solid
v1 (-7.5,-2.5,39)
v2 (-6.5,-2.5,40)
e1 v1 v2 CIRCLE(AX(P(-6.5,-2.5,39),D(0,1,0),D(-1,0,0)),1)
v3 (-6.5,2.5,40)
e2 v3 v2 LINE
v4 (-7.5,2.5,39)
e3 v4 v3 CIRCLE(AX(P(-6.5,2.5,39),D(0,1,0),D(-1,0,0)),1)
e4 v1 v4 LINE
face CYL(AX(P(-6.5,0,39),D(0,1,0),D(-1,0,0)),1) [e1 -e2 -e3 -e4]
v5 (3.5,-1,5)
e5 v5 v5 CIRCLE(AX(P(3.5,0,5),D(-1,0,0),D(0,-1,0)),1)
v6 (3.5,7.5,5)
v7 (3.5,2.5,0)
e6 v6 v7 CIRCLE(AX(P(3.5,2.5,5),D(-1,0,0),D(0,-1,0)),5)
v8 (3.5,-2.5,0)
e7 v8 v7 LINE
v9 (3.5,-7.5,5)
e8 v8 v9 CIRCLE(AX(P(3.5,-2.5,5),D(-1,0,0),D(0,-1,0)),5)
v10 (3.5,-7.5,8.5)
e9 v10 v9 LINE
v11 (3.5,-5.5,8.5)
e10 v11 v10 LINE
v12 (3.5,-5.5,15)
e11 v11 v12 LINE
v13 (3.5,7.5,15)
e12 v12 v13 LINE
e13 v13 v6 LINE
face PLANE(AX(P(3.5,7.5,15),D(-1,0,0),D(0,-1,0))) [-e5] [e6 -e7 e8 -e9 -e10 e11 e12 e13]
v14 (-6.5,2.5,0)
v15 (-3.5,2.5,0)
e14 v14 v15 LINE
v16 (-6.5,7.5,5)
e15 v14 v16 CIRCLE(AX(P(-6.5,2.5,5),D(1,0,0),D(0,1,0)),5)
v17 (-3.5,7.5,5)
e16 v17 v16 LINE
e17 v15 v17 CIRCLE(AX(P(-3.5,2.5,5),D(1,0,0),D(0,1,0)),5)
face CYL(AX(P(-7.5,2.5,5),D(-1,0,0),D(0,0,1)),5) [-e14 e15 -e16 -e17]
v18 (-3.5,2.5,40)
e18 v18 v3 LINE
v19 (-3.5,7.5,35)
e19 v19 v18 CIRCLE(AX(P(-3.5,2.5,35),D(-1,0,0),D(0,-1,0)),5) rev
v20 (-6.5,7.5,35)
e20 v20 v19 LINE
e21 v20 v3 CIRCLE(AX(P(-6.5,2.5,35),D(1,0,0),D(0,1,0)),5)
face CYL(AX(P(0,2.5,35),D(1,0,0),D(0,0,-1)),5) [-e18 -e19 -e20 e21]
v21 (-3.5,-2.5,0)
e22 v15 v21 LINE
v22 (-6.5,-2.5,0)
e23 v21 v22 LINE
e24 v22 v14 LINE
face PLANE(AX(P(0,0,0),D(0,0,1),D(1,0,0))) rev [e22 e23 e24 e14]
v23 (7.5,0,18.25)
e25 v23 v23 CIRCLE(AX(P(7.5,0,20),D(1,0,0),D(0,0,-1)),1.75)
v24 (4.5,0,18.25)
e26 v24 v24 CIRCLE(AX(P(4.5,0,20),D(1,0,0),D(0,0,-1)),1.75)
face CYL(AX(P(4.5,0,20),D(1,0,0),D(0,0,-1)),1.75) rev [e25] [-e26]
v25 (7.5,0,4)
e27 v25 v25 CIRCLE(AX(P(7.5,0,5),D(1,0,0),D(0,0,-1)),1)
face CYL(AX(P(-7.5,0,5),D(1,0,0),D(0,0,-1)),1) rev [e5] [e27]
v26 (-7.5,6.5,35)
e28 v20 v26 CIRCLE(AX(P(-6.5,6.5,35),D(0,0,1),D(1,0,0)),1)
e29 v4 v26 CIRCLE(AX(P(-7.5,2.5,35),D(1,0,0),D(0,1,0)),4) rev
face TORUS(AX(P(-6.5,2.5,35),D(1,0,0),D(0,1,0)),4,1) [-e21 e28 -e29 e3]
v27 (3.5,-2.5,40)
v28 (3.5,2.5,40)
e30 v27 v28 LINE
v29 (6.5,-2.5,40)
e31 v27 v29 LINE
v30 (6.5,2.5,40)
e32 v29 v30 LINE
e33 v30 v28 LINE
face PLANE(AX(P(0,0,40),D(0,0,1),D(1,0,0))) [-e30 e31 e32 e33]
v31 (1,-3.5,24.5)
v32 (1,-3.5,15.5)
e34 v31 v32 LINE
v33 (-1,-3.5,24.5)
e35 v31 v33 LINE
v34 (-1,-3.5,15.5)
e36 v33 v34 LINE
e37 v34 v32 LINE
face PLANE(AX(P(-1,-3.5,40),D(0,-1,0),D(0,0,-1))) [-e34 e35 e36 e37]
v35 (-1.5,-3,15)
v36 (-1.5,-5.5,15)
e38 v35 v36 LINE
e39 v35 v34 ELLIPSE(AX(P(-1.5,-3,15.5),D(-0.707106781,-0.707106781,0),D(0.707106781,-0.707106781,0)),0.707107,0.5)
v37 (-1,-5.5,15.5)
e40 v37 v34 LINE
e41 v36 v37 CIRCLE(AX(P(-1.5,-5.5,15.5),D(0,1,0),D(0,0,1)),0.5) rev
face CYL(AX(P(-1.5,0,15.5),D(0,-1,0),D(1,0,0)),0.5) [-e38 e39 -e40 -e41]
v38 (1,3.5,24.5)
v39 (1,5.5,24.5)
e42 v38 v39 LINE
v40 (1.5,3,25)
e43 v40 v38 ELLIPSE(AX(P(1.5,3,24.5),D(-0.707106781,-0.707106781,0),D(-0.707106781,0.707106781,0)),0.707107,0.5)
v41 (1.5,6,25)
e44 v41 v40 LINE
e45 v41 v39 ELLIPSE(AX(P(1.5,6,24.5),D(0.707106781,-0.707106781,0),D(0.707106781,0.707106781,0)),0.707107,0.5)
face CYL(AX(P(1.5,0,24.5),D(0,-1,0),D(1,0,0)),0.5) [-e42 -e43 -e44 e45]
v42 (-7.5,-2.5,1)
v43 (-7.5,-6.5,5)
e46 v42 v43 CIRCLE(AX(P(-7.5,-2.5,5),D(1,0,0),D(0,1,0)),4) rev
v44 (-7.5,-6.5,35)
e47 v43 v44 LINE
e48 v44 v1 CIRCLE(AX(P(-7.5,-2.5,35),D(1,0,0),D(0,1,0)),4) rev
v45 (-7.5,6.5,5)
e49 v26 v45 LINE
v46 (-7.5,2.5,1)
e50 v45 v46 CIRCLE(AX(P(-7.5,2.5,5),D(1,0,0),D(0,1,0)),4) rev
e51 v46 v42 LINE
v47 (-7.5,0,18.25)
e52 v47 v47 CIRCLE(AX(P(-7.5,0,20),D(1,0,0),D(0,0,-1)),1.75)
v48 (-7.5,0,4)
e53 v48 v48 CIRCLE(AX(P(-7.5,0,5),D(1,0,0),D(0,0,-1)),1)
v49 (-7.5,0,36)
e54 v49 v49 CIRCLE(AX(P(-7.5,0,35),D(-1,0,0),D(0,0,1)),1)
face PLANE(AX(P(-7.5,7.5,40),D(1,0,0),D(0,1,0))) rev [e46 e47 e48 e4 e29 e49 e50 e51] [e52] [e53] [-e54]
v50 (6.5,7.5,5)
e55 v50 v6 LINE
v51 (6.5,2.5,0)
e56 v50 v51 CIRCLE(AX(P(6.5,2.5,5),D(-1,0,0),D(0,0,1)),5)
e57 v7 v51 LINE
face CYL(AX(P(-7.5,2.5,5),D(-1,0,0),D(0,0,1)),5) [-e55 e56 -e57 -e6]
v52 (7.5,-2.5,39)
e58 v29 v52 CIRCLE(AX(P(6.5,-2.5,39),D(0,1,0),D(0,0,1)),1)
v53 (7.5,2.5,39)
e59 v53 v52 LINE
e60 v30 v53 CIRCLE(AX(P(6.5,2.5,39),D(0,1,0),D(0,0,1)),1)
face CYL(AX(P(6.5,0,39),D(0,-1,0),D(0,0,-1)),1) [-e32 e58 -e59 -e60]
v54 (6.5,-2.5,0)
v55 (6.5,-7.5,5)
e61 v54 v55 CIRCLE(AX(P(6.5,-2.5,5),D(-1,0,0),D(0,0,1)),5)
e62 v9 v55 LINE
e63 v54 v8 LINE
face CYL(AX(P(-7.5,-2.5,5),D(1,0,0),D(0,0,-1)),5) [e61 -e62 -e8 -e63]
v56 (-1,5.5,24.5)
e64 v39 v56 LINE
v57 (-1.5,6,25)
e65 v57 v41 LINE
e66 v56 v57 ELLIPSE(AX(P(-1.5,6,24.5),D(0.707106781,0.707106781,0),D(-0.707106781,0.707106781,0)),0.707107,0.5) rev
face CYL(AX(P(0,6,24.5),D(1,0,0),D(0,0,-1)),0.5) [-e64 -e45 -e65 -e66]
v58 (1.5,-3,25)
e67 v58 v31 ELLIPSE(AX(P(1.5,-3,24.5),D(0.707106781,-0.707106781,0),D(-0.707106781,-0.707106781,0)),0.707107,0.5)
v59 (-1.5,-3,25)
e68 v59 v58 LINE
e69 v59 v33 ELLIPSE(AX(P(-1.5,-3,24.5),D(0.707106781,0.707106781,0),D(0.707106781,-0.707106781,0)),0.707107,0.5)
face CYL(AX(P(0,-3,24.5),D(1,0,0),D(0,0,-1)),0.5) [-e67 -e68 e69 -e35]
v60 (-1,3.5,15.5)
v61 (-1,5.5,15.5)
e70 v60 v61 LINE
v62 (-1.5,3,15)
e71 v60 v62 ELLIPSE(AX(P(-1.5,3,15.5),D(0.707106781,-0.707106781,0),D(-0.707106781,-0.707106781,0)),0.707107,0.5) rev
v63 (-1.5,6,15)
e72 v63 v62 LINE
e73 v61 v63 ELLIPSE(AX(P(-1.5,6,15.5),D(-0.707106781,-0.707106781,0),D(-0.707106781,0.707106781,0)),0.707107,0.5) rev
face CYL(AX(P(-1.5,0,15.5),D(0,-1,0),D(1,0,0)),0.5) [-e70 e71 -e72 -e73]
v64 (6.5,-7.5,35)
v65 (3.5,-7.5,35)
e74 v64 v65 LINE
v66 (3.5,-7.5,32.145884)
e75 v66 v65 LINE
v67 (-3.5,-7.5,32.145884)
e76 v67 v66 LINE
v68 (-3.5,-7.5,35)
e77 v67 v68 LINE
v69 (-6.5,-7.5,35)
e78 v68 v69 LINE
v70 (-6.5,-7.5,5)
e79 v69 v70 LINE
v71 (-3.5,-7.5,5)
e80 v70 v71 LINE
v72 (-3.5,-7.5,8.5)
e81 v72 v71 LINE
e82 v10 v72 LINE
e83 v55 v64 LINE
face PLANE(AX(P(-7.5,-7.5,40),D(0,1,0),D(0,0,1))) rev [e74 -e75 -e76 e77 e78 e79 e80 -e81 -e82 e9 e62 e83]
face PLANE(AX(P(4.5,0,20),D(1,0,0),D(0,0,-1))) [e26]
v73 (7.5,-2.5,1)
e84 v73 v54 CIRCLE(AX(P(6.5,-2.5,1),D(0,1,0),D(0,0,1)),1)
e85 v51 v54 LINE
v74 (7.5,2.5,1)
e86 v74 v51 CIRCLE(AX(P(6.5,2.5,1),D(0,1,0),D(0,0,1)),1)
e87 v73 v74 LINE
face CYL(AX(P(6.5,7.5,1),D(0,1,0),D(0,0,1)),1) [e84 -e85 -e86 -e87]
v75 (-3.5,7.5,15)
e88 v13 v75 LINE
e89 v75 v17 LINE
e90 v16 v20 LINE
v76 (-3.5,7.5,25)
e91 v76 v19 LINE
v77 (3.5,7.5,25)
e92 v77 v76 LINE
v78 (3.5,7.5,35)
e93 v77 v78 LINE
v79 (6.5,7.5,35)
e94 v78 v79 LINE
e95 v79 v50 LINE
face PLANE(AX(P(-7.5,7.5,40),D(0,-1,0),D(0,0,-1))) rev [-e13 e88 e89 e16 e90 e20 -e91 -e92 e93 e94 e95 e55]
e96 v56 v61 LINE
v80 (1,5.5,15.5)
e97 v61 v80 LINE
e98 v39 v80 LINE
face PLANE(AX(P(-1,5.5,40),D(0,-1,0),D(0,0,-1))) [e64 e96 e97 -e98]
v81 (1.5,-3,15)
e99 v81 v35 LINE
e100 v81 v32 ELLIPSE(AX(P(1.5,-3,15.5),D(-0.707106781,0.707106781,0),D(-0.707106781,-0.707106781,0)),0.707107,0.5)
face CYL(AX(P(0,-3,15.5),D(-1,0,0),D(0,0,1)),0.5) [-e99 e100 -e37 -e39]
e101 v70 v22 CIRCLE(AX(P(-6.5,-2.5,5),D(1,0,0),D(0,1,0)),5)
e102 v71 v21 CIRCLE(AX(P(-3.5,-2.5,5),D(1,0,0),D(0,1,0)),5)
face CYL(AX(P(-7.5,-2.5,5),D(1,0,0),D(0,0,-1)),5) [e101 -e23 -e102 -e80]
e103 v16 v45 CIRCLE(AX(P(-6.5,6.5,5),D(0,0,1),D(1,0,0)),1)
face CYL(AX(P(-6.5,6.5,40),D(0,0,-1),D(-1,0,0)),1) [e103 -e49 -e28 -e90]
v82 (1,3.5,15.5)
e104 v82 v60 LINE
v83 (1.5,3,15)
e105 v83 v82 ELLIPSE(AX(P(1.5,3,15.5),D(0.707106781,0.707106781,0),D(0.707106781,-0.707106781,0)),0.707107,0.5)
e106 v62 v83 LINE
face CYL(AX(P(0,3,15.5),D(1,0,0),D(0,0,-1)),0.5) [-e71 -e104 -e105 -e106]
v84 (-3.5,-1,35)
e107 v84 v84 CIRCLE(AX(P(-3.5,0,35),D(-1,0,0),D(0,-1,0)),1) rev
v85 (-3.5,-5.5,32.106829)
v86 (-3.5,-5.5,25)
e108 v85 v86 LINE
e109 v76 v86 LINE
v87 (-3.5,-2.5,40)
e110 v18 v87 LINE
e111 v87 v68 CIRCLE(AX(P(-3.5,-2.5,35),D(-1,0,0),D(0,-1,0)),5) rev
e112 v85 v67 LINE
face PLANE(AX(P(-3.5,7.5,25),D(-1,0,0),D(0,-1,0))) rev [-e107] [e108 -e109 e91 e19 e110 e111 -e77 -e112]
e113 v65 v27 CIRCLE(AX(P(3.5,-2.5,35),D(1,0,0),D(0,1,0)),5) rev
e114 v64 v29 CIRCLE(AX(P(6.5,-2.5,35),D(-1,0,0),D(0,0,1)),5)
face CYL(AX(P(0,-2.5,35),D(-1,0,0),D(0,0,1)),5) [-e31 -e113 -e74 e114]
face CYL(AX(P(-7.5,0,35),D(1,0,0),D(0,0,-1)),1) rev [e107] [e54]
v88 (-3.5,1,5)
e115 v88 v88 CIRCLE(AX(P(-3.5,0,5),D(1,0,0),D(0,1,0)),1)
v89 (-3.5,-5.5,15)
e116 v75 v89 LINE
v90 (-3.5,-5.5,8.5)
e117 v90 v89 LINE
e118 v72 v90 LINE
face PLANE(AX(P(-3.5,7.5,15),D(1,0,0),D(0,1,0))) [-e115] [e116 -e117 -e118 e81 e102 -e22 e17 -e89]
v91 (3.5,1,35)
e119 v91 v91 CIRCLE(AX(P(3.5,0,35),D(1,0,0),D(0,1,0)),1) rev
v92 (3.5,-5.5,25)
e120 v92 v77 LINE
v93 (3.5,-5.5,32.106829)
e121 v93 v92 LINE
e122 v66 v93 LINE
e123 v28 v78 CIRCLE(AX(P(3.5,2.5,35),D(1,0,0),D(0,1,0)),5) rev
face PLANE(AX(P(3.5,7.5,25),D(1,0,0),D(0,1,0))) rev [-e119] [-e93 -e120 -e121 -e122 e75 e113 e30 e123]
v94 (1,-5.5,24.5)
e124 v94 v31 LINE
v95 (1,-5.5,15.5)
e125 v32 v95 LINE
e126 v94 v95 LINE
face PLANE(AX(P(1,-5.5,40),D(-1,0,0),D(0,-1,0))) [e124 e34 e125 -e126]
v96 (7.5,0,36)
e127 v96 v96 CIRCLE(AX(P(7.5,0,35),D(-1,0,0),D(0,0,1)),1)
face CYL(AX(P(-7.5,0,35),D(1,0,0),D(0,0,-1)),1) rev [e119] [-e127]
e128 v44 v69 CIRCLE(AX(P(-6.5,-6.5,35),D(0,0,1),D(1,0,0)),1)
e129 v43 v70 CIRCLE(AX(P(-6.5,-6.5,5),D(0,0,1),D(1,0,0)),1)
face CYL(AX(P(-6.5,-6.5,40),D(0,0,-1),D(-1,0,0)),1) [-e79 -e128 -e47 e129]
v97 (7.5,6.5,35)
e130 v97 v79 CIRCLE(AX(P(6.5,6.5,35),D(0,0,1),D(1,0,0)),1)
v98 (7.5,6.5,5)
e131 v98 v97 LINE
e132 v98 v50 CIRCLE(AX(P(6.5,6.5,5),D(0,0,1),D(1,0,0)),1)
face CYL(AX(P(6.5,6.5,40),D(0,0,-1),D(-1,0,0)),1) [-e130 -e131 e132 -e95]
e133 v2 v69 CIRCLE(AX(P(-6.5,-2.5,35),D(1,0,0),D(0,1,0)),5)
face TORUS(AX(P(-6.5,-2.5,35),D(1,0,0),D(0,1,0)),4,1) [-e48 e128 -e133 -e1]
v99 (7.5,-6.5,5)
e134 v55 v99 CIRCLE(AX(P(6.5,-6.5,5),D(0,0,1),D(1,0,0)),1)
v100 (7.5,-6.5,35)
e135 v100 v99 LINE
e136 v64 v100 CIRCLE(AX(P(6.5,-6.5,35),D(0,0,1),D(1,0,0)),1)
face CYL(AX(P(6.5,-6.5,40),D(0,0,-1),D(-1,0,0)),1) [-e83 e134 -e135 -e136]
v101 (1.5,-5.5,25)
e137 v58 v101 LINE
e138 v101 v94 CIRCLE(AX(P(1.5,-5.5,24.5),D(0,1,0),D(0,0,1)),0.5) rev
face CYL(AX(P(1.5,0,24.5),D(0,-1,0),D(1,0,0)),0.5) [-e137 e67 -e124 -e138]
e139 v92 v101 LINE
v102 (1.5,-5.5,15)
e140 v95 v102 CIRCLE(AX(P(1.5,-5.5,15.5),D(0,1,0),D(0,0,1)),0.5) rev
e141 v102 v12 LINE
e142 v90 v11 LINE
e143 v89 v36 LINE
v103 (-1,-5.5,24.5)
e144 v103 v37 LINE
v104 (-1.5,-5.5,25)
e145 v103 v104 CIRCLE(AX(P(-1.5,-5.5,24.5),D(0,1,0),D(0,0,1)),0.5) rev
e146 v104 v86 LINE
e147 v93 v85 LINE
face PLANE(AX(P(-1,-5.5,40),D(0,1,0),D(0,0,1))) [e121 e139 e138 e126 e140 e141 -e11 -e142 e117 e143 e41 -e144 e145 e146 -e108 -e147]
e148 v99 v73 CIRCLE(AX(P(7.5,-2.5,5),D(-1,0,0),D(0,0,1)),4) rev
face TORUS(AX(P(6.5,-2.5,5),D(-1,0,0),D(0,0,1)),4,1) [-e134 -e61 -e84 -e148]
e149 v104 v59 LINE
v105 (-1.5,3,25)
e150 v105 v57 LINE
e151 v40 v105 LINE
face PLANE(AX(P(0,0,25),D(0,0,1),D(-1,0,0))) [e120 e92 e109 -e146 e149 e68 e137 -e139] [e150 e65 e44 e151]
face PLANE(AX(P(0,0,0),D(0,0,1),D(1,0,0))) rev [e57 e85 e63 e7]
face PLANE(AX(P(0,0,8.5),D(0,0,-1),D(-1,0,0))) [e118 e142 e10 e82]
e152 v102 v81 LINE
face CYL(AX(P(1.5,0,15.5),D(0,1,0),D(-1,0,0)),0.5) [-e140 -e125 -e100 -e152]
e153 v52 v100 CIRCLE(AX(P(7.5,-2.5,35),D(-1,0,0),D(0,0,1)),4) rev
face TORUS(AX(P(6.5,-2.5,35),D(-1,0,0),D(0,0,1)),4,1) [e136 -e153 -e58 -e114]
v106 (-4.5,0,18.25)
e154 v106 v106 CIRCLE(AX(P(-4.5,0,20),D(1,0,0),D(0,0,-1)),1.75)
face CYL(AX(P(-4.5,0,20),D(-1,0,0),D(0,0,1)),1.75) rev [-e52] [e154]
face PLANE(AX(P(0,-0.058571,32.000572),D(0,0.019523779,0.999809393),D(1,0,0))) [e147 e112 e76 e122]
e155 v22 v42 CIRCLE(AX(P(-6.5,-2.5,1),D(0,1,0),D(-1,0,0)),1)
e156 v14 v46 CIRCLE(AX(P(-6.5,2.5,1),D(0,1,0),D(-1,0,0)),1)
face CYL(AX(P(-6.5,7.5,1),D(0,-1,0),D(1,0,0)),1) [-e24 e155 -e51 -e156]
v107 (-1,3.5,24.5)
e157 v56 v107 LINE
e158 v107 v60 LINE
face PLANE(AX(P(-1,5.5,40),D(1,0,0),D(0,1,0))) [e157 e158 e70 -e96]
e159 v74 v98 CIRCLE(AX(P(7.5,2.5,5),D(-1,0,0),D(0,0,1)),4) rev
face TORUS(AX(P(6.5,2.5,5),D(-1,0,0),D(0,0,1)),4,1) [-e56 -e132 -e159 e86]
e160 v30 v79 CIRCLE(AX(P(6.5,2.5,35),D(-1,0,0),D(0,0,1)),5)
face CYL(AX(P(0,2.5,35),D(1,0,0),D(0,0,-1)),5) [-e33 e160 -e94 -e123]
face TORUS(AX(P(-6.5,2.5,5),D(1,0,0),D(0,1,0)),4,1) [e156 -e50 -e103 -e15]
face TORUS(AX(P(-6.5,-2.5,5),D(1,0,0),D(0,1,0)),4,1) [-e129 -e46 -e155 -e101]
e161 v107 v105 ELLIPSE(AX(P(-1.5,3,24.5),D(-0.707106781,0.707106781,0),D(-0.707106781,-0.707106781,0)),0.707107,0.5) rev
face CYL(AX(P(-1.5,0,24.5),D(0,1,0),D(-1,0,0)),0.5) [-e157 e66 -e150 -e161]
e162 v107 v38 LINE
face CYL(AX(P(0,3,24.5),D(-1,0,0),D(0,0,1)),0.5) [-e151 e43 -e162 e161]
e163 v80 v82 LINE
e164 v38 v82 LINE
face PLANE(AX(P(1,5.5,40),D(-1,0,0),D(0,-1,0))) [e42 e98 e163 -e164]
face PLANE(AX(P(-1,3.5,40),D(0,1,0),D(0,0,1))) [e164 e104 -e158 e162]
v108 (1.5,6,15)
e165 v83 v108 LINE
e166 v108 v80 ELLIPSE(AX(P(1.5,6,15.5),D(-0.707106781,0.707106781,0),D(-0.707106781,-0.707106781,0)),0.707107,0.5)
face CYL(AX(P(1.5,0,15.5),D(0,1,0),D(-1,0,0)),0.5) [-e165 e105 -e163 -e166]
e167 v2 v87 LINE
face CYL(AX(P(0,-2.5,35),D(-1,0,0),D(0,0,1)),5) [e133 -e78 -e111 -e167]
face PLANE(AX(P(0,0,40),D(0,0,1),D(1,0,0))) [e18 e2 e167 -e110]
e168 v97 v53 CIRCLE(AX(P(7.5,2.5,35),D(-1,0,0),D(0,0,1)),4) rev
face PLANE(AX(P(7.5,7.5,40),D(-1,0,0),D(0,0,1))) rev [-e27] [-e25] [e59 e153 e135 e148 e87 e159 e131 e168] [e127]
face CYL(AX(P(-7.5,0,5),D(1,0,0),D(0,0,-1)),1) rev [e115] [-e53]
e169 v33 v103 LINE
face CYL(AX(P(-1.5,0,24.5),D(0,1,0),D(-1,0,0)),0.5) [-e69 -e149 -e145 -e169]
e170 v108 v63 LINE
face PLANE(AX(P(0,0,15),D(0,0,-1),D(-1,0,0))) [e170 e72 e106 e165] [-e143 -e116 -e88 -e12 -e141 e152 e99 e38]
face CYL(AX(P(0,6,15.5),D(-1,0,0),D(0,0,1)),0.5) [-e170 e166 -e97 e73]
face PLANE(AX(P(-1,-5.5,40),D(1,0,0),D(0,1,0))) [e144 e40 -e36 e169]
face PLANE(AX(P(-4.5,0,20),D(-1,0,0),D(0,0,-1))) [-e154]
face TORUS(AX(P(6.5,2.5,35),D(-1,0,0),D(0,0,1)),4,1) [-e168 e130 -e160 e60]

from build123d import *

# Parameters (mm, degrees)
BOTTOM_SECTION_BASE_SKETCH_W             = 15
BOTTOM_SECTION_BASE_SKETCH_H             = 15
BOTTOM_SECTION_EXTRUDE_DEPTH             = 40
HINGE_CUTOUT_SKETCH_W                    = 7
HINGE_CUTOUT_SKETCH_H                    = 15
HINGE_CUTOUT_EXTRUDED_CUT_DEPTH          = 15
HINGE_HOLE_SKETCH_R                      = 1
HINGE_HOLE_EXTRUDED_CUT_DEPTH            = 44.373378932
HINGER_CORNER_FILLETS_R                  = 5
STYLE_FILLETS_R                          = 1
ROUTING_HOLES_SKETCH_W                   = 2
ROUTING_HOLES_SKETCH_H                   = 2
ROUTING_HOLES_EXTRUDED_CUT_DEPTH         = 42.382363393
BACKING_START                            = -3.5
BACKING_EXTRUDE_DEPTH                    = 7
BOTTOM_SECTION_CONNECTION_HOLE_R         = 1.75
BOTTOM_SECTION_CONNECTION_HOLE_CUT_DEPTH = 3
SKETCH2_W                                = 7
SKETCH2_H                                = 2
BOTTOM_EXTENSION_EXTRUDE_DEPTH           = 6.5
FILLET1_R                                = 0.5


# Read off the part's stored shape, not the designer's step: Backing Extrude
with BuildPart() as part:
    # Bottom Section Base Sketch → Bottom Section Extrude (new body)
    with BuildSketch(Plane.XY):
        Rectangle(BOTTOM_SECTION_BASE_SKETCH_W, BOTTOM_SECTION_BASE_SKETCH_H)
    extrude(amount=BOTTOM_SECTION_EXTRUDE_DEPTH)

    # Hinge Cutout Sketch → Hinge Cutout Extruded Cut (cut)
    with BuildSketch(Plane.XY):
        Rectangle(HINGE_CUTOUT_SKETCH_W, HINGE_CUTOUT_SKETCH_H)
    hinge_cutout_extruded_cut = extrude(amount=HINGE_CUTOUT_EXTRUDED_CUT_DEPTH, mode=Mode.SUBTRACT)

    # Hinge Hole Sketch → Hinge Hole Extruded Cut (cut, through all)
    with BuildSketch(Plane(origin=(7.5, 0, 0), x_dir=(0, 0, -1), z_dir=(1, 0, 0))):
        with Locations((-5, 0)):
            Circle(HINGE_HOLE_SKETCH_R)
    hinge_hole_extruded_cut = extrude(amount=-HINGE_HOLE_EXTRUDED_CUT_DEPTH, mode=Mode.SUBTRACT)

    # Hinge and Hole Cutout Mirror: Hinge Cutout Extruded Cut, Hinge Hole Extruded Cut across plane
    add(hinge_cutout_extruded_cut.mirror(Plane.XY.offset(20)), mode=Mode.SUBTRACT)
    add(hinge_hole_extruded_cut.mirror(Plane.XY.offset(20)), mode=Mode.SUBTRACT)

    # Hinger Corner Fillets
    hinger_corner_fillets_edges = [part.edges().sort_by_distance(p)[0] for p in [
        (5.5, -7.5, 0),
        (-5.5, 7.5, 0),
        (-5.5, -7.5, 40),
        (-5.5, 7.5, 40),
        (5.5, -7.5, 40),
        (-5.5, -7.5, 0),
        (5.5, 7.5, 0),
        (5.5, 7.5, 40),
    ]]
    fillet(hinger_corner_fillets_edges, radius=HINGER_CORNER_FILLETS_R)

    # Style Fillets
    style_fillets_edges = [part.edges().sort_by_distance(p)[0] for p in [
        (7.5, 0, 40),
        (7.5, 7.5, 20),
        (-7.5, 7.5, 20),
        (7.5, 0, 0),
        (7.5, -7.5, 20),
        (7.5, 6.035533906, 1.464466094),
        (7.5, -6.035533906, 1.464466094),
        (7.5, -6.035533906, 38.535533906),
        (7.5, 6.035533906, 38.535533906),
        (-7.5, -7.5, 20),
        (-7.5, 0, 40),
        (-7.5, 0, 0),
        (-7.5, -6.035533906, 1.464466094),
        (-7.5, 6.035533906, 1.464466094),
        (-7.5, 6.035533906, 38.535533906),
        (-7.5, -6.035533906, 38.535533906),
    ]]
    fillet(style_fillets_edges, radius=STYLE_FILLETS_R)

    # Routing Holes Sketch → Routing Holes Extruded Cut (cut, through all)
    with BuildSketch(Plane.XY):
        with Locations((0, 4.5)):
            Rectangle(ROUTING_HOLES_SKETCH_W, ROUTING_HOLES_SKETCH_H)
        with Locations((0, -4.5)):
            Rectangle(ROUTING_HOLES_SKETCH_W, ROUTING_HOLES_SKETCH_H)
    extrude(amount=ROUTING_HOLES_EXTRUDED_CUT_DEPTH, mode=Mode.SUBTRACT)

    # Backing Extrude outline → Backing Extrude (add)
    with BuildSketch(Plane.YZ.offset(BACKING_START)):
        Polygon((-7.5, 32.145884327), (-7.5, 25), (-5.5, 25), (-5.5, 32.106829325), align=None)
    extrude(amount=BACKING_EXTRUDE_DEPTH)

    # Bottom Section Connection Hole → Bottom Section Connection Hole Cut (cut)
    with BuildSketch(Plane(origin=(7.5, 0, 0), x_dir=(0, 0, -1), z_dir=(1, 0, 0))):
        with Locations((-20, 0)):
            Circle(BOTTOM_SECTION_CONNECTION_HOLE_R)
    bottom_section_connection_hole_cut = extrude(amount=-BOTTOM_SECTION_CONNECTION_HOLE_CUT_DEPTH, mode=Mode.SUBTRACT)

    # Sketch2 → Bottom extension Extrude (add)
    with BuildSketch(Plane(origin=(0, 0, 15), x_dir=(-1, 0, 0), z_dir=(0, 0, -1))):
        with Locations((0, -6.5)):
            Rectangle(SKETCH2_W, SKETCH2_H)
    extrude(amount=BOTTOM_EXTENSION_EXTRUDE_DEPTH)

    # Connection Hole Mirror: Bottom Section Connection Hole Cut across plane
    add(bottom_section_connection_hole_cut.mirror(Plane(origin=(0, 0, 0), x_dir=(0, 0, 1), z_dir=(1, 0, 0))), mode=Mode.SUBTRACT)

    # Fillet1
    fillet1_edges = [part.edges().sort_by_distance(p)[0] for p in [
        (-1, -4.5, 25),
        (0, -3.5, 25),
        (1, -4.5, 25),
        (0, 5.5, 25),
        (1, 4.5, 25),
        (0, 3.5, 25),
        (-1, 4.5, 25),
        (-1, 4.5, 15),
        (0, 3.5, 15),
        (1, 4.5, 15),
        (0, 5.5, 15),
        (1, -4.5, 15),
        (0, -3.5, 15),
        (-1, -4.5, 15),
    ]]
    fillet(fillet1_edges, radius=FILLET1_R)


solid = part.part
